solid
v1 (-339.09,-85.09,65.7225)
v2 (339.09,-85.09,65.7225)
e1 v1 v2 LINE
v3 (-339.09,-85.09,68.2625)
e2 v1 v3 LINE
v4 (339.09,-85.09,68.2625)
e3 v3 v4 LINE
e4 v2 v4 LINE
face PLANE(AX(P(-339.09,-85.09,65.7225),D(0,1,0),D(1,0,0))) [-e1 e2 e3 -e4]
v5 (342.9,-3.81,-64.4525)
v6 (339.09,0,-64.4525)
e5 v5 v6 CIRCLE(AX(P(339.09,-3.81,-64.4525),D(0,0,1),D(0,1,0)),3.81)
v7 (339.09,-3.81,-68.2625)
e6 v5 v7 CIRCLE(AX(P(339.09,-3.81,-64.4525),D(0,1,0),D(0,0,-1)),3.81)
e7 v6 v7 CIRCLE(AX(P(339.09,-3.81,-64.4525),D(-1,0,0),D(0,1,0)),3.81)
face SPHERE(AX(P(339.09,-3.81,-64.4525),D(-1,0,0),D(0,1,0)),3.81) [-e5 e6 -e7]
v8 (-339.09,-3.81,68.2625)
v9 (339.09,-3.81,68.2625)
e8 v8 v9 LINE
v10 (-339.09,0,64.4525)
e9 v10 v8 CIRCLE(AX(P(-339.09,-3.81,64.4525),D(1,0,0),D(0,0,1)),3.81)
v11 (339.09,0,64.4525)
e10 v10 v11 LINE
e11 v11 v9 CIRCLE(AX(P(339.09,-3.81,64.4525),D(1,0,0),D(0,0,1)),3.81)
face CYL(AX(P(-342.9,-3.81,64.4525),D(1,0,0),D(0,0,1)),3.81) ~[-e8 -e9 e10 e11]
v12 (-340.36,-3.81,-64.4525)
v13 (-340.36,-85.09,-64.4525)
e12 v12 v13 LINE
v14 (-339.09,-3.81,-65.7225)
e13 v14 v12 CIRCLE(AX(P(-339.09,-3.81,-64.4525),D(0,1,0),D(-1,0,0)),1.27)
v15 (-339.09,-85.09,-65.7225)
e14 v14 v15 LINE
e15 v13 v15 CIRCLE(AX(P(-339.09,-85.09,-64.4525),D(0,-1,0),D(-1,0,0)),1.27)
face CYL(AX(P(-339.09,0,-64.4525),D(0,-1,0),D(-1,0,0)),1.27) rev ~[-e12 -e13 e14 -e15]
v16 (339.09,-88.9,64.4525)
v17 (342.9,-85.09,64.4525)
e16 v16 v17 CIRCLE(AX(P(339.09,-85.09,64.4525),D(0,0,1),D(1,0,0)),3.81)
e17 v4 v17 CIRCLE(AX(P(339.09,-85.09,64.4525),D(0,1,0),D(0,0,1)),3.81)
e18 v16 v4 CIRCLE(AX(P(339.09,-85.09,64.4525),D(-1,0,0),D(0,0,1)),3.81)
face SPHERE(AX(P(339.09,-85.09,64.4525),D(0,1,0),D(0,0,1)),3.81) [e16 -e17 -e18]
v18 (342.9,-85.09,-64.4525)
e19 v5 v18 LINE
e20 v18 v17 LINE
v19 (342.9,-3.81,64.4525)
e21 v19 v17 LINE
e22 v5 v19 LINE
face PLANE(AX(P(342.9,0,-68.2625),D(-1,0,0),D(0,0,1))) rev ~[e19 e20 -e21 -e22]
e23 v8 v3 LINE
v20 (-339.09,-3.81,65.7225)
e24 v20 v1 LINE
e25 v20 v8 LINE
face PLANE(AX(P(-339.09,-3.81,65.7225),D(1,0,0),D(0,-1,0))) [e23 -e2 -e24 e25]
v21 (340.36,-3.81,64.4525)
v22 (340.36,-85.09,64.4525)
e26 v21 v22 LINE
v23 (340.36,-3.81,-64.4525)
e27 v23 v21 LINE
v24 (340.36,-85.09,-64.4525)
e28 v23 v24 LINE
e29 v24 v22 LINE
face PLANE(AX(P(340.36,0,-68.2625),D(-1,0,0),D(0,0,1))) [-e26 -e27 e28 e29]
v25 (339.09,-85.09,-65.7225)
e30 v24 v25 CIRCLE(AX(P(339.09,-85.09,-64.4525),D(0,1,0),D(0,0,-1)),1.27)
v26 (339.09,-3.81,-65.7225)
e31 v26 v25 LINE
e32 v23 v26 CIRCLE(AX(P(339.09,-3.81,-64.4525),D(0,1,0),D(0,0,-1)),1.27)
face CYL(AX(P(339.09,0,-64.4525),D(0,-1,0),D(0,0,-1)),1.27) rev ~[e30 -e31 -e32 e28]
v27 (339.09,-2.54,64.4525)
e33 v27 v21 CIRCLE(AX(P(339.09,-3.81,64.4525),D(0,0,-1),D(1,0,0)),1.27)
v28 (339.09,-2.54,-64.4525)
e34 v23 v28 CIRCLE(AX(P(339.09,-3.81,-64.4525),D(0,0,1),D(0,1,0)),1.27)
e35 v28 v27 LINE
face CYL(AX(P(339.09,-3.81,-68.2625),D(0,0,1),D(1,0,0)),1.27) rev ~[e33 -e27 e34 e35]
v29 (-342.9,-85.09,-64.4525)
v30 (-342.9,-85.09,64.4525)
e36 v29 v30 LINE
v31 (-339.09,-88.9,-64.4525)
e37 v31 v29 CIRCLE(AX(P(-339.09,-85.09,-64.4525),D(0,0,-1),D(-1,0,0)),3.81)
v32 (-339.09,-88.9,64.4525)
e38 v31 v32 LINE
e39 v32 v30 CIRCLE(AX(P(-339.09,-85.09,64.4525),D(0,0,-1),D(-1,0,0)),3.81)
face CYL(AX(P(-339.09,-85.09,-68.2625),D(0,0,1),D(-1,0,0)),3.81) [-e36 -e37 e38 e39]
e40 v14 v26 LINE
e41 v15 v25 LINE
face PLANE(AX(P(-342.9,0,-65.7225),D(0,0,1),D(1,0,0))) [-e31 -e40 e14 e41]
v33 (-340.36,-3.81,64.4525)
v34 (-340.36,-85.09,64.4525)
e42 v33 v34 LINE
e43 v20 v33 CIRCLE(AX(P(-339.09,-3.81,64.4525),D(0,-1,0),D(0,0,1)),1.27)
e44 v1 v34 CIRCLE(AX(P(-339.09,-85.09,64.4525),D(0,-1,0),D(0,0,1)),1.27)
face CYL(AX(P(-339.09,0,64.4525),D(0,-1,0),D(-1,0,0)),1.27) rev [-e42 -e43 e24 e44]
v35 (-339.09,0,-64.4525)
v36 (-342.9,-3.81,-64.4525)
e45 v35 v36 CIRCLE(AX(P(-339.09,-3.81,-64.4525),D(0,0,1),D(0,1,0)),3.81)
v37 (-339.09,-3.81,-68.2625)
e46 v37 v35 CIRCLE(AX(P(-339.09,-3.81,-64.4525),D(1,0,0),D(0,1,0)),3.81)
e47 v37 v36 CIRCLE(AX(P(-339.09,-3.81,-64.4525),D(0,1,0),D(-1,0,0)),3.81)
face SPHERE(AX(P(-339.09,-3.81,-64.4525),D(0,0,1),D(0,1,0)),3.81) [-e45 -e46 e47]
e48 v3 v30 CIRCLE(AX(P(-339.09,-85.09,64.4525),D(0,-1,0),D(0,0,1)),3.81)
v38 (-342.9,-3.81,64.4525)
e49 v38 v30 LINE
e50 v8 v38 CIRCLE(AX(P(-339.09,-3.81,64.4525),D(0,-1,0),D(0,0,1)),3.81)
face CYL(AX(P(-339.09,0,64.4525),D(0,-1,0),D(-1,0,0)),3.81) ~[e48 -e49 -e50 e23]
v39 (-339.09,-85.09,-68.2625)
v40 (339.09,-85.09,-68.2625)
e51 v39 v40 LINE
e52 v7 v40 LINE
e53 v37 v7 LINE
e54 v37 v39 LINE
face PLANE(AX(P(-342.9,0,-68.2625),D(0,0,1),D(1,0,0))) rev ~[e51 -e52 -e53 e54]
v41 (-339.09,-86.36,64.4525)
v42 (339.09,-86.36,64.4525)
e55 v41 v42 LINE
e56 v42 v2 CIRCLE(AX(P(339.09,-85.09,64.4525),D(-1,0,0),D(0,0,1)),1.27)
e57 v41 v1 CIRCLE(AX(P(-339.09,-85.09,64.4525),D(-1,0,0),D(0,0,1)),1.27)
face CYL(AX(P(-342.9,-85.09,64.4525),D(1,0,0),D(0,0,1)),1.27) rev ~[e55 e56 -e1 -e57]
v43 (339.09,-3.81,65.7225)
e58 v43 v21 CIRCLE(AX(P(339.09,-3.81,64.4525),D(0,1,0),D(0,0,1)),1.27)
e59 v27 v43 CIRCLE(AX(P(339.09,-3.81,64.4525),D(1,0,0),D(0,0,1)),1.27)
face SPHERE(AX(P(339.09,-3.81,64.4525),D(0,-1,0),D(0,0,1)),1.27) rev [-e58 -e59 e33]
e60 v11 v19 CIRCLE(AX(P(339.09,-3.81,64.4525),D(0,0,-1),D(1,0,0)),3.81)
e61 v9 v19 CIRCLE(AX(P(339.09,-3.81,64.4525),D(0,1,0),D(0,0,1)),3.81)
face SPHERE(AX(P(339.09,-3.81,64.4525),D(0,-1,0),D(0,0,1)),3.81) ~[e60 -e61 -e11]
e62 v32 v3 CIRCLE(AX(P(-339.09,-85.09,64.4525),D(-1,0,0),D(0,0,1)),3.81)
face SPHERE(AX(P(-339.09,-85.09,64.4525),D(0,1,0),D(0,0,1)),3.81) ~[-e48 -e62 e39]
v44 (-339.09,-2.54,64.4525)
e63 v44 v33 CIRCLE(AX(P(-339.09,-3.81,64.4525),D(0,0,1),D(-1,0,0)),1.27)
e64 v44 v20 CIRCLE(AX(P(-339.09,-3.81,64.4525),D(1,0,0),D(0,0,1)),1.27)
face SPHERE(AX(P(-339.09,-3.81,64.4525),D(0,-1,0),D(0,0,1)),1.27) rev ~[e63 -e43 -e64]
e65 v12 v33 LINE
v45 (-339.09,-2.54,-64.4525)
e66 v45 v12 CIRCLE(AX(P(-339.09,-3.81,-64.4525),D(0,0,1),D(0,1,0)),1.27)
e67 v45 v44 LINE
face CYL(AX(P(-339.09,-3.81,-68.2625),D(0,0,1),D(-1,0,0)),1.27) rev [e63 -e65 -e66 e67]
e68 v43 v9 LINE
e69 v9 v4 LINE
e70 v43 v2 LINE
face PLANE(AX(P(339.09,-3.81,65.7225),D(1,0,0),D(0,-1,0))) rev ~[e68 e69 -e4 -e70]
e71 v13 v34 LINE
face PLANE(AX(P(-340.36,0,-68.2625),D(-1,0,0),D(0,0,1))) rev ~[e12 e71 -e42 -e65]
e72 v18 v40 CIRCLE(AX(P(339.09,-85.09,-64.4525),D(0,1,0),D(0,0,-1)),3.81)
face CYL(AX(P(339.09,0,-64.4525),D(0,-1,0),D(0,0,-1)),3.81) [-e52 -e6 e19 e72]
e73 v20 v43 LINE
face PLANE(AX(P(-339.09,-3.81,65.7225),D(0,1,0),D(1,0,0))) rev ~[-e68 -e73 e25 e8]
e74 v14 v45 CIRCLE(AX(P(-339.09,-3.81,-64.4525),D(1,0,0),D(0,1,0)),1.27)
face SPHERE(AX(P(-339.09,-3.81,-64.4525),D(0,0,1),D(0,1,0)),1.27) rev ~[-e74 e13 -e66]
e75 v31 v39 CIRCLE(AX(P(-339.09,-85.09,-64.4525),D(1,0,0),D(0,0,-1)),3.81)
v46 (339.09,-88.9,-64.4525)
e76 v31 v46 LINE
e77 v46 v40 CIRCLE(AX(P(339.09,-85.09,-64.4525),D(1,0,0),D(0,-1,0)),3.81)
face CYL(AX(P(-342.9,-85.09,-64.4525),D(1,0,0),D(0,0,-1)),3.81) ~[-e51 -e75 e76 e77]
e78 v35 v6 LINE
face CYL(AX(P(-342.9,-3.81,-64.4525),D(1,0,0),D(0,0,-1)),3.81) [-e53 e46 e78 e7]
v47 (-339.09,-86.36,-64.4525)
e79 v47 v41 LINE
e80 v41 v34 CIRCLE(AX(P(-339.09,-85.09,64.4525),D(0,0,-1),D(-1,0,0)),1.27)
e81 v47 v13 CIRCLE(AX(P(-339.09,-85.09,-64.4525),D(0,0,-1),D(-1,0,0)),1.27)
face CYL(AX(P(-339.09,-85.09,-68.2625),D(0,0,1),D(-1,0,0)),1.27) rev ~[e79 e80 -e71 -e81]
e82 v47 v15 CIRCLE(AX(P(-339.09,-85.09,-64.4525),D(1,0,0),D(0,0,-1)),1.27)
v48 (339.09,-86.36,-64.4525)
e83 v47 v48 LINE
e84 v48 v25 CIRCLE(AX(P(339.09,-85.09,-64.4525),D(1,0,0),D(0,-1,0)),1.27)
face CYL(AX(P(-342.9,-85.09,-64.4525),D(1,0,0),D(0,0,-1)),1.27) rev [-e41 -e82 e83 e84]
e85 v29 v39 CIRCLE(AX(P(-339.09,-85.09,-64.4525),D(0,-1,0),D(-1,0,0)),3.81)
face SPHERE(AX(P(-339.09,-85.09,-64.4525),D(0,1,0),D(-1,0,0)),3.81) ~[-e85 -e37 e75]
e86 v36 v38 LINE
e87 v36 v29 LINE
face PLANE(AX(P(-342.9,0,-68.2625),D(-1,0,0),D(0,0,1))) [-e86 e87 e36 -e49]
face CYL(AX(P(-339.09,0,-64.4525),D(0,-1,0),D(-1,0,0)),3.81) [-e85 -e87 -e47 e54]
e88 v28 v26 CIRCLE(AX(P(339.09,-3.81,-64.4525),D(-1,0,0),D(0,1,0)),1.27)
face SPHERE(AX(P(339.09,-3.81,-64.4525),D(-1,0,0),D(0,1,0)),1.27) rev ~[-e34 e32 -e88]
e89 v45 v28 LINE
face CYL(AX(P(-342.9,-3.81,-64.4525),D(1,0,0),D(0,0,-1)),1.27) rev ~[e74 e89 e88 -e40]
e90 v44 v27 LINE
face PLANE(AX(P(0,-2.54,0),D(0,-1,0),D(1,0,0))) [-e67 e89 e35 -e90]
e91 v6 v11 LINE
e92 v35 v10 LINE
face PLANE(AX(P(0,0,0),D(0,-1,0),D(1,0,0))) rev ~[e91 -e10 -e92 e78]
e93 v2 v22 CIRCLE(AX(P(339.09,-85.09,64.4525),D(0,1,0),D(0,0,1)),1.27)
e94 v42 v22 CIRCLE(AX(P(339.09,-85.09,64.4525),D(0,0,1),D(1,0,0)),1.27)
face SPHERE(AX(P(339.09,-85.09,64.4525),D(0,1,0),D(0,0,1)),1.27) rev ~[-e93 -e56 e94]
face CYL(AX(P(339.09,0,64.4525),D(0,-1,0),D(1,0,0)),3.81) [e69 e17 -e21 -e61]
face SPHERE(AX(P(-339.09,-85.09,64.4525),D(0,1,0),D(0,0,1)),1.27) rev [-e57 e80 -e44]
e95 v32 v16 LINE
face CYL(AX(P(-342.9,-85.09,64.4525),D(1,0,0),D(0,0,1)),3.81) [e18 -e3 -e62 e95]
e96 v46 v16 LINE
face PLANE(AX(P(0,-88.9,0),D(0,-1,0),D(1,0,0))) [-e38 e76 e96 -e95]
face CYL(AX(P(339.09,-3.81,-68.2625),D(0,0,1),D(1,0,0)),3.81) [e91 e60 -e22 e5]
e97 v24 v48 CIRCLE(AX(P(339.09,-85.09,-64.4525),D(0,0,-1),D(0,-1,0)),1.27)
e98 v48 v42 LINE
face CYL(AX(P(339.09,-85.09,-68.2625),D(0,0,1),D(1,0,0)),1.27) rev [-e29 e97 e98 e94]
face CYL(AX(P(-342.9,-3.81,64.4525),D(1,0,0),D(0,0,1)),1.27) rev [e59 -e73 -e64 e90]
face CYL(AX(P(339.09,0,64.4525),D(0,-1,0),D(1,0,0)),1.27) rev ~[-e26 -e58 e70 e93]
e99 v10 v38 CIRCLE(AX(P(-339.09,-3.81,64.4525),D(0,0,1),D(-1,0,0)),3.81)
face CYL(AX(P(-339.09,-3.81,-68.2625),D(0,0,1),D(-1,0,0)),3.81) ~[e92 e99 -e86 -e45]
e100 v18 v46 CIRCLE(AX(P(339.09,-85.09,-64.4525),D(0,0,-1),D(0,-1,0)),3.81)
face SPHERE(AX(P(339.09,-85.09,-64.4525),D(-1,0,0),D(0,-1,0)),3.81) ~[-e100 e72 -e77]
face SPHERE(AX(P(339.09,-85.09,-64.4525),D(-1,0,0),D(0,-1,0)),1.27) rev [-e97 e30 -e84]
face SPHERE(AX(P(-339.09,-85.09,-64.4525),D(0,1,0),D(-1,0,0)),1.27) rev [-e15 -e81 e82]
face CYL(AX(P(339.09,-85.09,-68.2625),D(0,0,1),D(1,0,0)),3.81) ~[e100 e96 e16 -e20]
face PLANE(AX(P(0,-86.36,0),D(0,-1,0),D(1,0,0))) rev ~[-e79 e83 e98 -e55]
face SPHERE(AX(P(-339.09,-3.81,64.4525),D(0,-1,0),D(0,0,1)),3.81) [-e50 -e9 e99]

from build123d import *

# Parameters (mm, degrees)
F0_W     = 685.8
F0_H     = 136.525
F1_DEPTH = 88.9
F2_R     = 3.81
F3_T     = -2.54


# Not quite as in the source:
# - a shell that OpenCascade refuses in one call is made with other operations: the cavity is built on its own and cut out


with BuildPart() as f1:
    # F0 (on Front) → F1 (new body)
    with BuildSketch(Plane.XZ):
        Rectangle(F0_W, F0_H)
    extrude(amount=F1_DEPTH)

    # F2
    f2_edges = [f1.edges().sort_by_distance(p)[0] for p in [
        (-342.9, -44.45, 68.2625),
        (342.9, -44.45, 68.2625),
        (0, 0, 68.2625),
        (0, -88.9, 68.2625),
        (-342.9, 0, 0),
        (0, 0, -68.2625),
        (342.9, 0, 0),
        (-342.9, -44.45, -68.2625),
        (-342.9, -88.9, 0),
        (0, -88.9, -68.2625),
        (342.9, -88.9, 0),
        (342.9, -44.45, -68.2625),
    ]]
    fillet(f2_edges, radius=F2_R)

    # F3: a shell. OpenCascade refuses it in one call, so the cavity is built on its own and cut out:
    # the body offset inwards by the wall thickness, plus a prism from it out through each open face.
    f3_core = offset(f1.part, amount=F3_T, mode=Mode.PRIVATE)
    f3_exits = [f3_core.faces().sort_by_distance(p)[0] for p in [
        (0, -44.45, 65.7225),
    ]]
    add(f3_core, mode=Mode.SUBTRACT)
    extrude(f3_exits, amount=-F3_T, mode=Mode.SUBTRACT)


solid = f1.part
